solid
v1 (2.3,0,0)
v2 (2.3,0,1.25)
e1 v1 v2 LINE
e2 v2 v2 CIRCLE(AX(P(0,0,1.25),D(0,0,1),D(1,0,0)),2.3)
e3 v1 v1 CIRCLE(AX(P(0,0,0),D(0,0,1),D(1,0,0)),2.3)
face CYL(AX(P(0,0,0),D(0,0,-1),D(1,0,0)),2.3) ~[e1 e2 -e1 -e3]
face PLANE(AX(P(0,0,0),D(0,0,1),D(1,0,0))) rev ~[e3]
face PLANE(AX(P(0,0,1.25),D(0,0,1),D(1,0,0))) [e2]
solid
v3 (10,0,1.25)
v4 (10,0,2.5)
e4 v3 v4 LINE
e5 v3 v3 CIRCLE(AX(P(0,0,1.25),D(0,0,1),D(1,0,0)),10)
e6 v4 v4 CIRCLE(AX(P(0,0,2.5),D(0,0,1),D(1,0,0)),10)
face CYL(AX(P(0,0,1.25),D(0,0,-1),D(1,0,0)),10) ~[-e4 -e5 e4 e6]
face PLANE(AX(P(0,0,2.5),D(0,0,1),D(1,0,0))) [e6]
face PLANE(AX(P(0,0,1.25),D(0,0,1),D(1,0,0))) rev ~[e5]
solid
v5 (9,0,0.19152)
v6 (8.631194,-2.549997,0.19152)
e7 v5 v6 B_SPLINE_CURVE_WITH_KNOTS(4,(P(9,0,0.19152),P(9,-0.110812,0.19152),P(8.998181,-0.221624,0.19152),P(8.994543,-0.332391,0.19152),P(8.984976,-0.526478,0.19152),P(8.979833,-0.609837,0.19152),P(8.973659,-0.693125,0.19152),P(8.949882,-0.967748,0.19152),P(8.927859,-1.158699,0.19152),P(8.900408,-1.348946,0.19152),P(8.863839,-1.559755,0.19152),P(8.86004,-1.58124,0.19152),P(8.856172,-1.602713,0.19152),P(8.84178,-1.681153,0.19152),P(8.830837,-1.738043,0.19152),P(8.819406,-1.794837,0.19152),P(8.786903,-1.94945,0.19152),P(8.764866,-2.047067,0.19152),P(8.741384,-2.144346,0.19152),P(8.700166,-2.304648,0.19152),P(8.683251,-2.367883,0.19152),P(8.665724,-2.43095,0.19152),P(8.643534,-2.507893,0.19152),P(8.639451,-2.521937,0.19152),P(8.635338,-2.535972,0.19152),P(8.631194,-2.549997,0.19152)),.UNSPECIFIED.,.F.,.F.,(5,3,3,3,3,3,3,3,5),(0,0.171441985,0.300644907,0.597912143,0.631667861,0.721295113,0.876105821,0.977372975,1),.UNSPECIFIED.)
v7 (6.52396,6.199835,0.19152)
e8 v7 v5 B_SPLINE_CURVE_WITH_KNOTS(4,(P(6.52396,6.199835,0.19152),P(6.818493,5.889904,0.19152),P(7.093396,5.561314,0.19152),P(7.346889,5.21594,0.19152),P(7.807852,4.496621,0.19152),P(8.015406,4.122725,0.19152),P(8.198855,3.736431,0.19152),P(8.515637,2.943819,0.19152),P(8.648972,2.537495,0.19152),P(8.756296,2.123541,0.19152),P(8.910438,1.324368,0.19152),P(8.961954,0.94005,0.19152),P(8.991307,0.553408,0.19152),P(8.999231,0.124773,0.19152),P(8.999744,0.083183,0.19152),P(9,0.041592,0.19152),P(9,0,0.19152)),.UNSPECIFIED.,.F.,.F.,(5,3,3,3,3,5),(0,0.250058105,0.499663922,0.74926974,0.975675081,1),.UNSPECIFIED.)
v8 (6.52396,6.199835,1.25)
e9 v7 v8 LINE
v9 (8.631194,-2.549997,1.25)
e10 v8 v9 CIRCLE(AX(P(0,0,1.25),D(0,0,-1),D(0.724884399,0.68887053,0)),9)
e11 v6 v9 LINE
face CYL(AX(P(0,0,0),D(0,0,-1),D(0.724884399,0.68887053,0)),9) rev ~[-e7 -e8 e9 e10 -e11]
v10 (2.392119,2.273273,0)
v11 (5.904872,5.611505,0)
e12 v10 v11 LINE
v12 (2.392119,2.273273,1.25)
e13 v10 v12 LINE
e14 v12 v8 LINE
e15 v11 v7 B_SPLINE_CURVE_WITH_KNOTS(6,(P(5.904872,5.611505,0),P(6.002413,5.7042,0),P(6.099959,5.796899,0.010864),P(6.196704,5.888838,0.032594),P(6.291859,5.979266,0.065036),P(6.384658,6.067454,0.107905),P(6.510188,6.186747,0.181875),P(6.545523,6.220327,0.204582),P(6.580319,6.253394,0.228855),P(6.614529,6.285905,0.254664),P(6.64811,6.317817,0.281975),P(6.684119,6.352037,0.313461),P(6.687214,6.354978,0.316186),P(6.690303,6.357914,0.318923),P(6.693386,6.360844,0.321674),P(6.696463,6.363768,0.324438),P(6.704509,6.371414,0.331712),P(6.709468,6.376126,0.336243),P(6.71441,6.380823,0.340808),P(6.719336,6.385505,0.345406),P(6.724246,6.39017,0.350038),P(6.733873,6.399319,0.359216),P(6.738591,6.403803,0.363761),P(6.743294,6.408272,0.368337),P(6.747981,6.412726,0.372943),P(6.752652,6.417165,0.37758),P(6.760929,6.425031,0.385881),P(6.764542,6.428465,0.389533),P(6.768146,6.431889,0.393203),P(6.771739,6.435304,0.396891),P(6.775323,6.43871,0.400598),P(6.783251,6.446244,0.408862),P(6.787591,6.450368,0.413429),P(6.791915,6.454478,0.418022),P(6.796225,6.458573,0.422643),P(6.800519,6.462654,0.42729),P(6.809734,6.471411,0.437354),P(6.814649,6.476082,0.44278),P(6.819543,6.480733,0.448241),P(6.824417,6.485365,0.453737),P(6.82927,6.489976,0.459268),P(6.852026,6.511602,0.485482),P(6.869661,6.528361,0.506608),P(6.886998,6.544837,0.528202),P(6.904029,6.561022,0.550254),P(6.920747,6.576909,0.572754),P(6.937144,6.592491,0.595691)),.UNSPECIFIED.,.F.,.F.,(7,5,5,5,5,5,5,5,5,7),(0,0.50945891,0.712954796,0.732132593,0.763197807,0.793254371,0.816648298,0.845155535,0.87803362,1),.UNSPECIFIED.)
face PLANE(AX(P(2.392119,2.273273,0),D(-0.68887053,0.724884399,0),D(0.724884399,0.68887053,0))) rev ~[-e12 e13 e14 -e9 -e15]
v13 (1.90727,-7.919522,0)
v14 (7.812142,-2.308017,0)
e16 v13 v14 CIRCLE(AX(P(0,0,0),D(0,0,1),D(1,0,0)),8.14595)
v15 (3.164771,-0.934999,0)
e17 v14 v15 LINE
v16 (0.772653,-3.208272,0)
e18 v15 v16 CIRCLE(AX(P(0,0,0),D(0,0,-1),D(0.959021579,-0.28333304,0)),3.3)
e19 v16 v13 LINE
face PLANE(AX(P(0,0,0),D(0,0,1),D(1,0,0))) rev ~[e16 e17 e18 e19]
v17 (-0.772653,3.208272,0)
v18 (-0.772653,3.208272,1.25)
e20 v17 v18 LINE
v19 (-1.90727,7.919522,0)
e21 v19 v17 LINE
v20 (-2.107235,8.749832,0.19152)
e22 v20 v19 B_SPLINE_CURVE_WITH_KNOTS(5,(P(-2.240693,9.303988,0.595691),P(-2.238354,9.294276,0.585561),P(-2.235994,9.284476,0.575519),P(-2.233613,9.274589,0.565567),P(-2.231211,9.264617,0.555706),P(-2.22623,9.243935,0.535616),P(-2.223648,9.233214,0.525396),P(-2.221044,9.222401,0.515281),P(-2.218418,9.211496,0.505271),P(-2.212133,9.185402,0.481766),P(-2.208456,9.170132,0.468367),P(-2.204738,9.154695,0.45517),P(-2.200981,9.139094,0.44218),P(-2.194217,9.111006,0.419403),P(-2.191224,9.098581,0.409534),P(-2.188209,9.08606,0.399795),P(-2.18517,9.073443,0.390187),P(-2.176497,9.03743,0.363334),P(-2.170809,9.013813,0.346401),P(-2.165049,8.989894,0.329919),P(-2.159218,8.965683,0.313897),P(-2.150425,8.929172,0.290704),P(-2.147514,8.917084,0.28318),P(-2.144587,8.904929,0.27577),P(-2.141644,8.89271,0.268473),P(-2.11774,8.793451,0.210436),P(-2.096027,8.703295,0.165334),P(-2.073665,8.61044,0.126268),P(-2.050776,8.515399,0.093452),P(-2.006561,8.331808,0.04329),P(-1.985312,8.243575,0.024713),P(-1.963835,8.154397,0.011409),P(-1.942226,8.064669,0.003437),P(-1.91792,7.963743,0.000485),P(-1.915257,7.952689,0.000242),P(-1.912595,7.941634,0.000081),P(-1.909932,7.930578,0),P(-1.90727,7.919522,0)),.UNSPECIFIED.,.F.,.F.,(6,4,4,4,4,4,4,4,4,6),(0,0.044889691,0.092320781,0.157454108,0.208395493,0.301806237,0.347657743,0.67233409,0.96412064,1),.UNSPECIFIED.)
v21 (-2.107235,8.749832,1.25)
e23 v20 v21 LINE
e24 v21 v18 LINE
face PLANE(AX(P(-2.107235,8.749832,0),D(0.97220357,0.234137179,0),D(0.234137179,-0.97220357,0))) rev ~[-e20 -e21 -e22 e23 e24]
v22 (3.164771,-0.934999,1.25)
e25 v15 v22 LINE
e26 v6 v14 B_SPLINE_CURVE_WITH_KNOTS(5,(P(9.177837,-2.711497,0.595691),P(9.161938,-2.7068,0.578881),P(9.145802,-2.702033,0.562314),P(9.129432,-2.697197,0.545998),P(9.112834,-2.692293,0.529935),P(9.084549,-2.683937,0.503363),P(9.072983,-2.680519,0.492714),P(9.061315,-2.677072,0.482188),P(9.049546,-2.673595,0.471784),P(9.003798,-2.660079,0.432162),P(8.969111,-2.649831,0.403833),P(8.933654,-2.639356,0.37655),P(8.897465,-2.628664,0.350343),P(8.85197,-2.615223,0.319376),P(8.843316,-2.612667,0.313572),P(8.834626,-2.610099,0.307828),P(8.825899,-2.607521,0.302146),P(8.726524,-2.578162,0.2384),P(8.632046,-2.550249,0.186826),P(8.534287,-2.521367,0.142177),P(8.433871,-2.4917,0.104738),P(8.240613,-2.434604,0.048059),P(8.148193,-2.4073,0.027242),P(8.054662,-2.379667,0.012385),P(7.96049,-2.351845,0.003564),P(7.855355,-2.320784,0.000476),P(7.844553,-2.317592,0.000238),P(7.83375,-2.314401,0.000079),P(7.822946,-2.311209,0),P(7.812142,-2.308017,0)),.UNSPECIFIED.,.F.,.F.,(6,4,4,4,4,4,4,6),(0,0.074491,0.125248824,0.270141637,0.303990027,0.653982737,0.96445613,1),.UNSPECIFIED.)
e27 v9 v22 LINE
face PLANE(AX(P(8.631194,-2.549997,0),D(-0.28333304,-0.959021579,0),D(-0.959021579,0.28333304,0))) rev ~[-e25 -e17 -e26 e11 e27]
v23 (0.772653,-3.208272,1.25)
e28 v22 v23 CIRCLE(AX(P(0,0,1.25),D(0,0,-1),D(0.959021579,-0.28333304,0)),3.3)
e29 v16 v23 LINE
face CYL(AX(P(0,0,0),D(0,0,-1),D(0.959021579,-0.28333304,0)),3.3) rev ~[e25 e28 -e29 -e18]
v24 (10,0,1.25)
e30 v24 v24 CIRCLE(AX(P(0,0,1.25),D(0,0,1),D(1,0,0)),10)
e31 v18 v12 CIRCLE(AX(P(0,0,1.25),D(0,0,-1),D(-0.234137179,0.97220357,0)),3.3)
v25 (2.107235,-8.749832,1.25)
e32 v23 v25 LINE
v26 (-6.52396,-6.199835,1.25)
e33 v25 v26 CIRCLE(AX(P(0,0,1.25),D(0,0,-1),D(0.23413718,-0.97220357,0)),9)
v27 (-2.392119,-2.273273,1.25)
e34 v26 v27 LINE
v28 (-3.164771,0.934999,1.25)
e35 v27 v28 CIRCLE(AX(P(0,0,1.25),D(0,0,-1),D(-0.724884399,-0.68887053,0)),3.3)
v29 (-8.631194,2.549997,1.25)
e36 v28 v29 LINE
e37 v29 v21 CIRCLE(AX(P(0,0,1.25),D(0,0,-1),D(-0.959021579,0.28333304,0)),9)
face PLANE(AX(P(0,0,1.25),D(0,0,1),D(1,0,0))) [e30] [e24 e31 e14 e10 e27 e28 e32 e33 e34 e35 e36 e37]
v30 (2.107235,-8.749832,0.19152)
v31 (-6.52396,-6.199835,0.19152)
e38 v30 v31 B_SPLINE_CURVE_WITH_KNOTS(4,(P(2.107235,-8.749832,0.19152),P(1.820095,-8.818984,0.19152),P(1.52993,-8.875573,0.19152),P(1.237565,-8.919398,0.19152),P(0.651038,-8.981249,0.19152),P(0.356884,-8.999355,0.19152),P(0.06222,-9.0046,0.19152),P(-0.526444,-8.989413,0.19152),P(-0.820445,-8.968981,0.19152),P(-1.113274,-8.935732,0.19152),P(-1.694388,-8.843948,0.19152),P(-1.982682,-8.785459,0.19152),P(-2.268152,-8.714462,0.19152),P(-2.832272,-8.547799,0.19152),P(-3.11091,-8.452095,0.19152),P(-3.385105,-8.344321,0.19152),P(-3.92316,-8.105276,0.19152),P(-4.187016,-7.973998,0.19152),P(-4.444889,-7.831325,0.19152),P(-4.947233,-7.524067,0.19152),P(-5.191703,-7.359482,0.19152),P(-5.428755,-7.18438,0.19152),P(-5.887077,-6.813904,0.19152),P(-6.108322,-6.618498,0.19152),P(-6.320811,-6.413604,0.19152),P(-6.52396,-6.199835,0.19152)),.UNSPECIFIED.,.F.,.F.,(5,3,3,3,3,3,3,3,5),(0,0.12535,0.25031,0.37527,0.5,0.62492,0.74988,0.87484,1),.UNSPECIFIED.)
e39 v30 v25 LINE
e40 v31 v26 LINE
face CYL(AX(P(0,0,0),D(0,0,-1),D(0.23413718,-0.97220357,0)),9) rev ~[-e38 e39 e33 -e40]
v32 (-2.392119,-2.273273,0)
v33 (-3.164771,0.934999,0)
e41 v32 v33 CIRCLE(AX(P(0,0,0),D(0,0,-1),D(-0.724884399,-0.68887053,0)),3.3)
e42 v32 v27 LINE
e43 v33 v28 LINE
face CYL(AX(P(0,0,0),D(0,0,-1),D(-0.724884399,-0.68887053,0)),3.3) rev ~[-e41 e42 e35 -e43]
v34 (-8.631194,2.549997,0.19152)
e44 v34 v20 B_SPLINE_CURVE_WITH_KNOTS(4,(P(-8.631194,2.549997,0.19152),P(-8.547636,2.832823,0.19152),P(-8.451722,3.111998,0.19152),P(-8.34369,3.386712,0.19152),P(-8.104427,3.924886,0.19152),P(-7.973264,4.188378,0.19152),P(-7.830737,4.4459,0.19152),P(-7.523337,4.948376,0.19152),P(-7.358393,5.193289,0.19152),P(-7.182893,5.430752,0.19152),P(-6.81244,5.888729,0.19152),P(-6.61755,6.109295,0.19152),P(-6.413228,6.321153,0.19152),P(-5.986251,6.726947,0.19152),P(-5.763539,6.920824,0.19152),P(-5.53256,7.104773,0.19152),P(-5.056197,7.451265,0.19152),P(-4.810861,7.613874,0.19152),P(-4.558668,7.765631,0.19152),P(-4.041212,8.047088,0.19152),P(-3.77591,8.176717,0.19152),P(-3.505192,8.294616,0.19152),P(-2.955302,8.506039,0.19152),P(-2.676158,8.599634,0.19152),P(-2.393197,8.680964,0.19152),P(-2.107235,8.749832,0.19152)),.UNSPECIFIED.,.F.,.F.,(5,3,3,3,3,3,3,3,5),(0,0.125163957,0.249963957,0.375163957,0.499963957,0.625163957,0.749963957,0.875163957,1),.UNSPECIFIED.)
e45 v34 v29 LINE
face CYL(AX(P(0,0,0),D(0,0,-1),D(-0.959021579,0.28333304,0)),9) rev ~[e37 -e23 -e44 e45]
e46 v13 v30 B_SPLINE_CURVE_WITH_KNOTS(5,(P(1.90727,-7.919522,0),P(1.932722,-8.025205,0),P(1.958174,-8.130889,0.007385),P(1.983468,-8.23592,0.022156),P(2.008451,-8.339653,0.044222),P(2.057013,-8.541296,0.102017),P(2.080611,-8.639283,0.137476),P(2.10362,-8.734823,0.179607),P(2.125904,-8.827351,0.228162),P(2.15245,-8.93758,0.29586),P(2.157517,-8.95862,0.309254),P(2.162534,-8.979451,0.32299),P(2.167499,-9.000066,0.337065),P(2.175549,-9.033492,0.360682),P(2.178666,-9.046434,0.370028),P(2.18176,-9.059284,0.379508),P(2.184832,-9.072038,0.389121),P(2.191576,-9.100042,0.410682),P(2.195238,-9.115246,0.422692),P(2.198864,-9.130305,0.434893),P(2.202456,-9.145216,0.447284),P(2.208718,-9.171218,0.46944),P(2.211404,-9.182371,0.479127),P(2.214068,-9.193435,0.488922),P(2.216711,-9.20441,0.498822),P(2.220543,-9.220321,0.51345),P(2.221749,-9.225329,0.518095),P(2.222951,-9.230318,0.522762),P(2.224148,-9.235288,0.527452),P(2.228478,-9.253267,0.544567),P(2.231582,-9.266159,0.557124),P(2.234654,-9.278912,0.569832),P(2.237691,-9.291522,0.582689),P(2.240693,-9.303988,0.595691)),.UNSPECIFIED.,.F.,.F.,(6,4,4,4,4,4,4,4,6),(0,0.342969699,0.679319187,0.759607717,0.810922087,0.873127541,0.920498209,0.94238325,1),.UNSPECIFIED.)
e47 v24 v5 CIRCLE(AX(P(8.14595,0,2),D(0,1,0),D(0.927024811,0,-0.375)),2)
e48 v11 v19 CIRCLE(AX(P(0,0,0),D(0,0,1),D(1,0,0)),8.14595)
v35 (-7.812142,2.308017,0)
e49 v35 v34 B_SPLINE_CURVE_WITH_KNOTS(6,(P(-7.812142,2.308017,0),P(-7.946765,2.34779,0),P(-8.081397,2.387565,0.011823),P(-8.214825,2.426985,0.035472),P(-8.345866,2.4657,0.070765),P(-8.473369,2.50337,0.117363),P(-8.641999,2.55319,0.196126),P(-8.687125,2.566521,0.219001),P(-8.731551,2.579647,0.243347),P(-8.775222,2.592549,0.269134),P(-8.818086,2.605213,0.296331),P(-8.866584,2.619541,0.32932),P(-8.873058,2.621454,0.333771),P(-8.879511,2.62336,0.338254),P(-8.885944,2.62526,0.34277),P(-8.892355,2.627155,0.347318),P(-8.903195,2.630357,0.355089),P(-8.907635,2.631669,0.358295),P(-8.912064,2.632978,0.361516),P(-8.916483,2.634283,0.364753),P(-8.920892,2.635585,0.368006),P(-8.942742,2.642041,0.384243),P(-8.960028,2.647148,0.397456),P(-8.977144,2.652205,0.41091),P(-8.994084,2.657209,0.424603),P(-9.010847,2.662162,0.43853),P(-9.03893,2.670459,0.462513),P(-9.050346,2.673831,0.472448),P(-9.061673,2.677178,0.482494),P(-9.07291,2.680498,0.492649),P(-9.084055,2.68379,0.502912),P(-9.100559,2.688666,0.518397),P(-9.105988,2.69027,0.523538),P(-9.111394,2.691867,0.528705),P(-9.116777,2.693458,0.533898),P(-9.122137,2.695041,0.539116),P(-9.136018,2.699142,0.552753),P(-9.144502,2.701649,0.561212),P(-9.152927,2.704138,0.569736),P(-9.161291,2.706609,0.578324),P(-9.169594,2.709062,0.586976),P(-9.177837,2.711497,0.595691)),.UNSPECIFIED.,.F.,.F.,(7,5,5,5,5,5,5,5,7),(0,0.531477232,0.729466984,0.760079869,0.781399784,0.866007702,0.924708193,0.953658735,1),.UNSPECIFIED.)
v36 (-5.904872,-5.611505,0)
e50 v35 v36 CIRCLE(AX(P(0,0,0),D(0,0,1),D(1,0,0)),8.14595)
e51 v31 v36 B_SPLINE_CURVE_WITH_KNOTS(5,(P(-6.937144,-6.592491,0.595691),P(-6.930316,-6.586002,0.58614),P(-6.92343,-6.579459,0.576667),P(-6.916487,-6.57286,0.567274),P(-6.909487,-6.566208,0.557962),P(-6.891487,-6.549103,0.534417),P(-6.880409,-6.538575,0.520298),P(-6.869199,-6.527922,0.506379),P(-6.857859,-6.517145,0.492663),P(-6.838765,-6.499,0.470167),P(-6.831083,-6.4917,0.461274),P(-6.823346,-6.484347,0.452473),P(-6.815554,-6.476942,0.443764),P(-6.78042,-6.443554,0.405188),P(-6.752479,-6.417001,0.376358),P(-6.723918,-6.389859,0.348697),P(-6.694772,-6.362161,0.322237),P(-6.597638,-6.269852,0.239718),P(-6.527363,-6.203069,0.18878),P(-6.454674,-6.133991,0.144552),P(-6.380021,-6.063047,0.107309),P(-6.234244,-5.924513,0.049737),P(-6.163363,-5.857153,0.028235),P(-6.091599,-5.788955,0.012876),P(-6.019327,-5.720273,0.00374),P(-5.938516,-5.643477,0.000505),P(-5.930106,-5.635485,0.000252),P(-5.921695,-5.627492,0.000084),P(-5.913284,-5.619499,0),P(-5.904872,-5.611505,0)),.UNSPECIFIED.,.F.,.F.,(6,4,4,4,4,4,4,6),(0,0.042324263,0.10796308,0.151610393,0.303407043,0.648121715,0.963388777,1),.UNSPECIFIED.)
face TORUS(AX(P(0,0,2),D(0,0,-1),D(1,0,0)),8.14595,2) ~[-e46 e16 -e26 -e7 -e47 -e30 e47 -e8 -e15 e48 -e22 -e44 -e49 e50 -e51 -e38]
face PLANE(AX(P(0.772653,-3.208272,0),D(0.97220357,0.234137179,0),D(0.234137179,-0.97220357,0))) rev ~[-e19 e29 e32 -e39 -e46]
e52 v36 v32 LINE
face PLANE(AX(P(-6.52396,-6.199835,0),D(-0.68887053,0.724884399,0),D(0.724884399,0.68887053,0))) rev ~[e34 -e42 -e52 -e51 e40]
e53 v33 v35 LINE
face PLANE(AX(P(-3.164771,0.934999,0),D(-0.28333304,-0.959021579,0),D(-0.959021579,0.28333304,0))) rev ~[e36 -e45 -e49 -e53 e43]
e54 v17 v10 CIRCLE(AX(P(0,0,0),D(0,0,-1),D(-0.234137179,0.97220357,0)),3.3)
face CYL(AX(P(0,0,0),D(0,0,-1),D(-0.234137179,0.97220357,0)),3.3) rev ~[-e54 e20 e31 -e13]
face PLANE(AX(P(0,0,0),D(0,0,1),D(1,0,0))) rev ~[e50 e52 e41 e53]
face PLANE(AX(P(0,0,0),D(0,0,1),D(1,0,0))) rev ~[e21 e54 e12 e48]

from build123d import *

# Parameters (mm, degrees)
F0_R     = 2.3
F1_DEPTH = 1.25
F0_R_2   = 10
F3_START = 1.25
F3_DEPTH = 1.25


# Not quite as in the source:
# - a fillet or chamfer that OpenCascade refuses, or shapes differently, is made with other operations: its cross-section is extruded or revolved along the edge and cut away or added


with BuildPart() as f1:
    # F0 (on Top) → F1 (new body)
    with BuildSketch(Plane.XY):
        Circle(F0_R)
    extrude(amount=F1_DEPTH)


with BuildPart() as f1b:
    # F0 (on Top) → F1, piece 2 (new body)
    with BuildSketch(Plane.XY):
        Circle(F0_R_2)
        with BuildLine():
            ThreePointArc((2.1072346154, -8.7498321284), (-2.5499973556, -8.6311942098), (-6.5239595944, -6.1998347729))
            Line((-6.5239595944, -6.1998347729), (-2.3921185179, -2.27327275))
            ThreePointArc((-2.3921185179, -2.27327275), (-3.2082717804, -0.7726526923), (-3.1647712102, 0.9349990304))
            Line((-3.1647712102, 0.9349990304), (-8.6311942098, 2.5499973556))
            ThreePointArc((-8.6311942098, 2.5499973556), (-6.1998347729, 6.5239595944), (-2.1072346154, 8.7498321284))
            Line((-2.1072346154, 8.7498321284), (-0.7726526923, 3.2082717804))
            ThreePointArc((-0.7726526923, 3.2082717804), (0.9349990304, 3.1647712102), (2.3921185179, 2.27327275))
            Line((2.3921185179, 2.27327275), (6.5239595944, 6.1998347729))
            ThreePointArc((6.5239595944, 6.1998347729), (8.7498321284, 2.1072346154), (8.6311942098, -2.5499973556))
            Line((8.6311942098, -2.5499973556), (3.1647712102, -0.9349990304))
            ThreePointArc((3.1647712102, -0.9349990304), (2.27327275, -2.3921185179), (0.7726526923, -3.2082717804))
            Line((0.7726526923, -3.2082717804), (2.1072346154, -8.7498321284))
        make_face(mode=Mode.SUBTRACT)
    extrude(amount=F1_DEPTH)

    # F2: fillet of radius 2 on 1 edges, made by hand

    # F2_s1 → F2_t2 (revolve, cut)
    with BuildSketch(Plane.XZ):
        with BuildLine():
            ThreePointArc((10, 1.25), (9.263984367, 0.3416876048), (8.1459503782, 0))
            Line((8.1459503782, 0), (10, 0))
            Line((10, 0), (10, 1.25))
        make_face()
    revolve(axis=Axis((0, 0, 0), (0, 0, 1)), mode=Mode.SUBTRACT)


with BuildPart() as f3:
    # F0 (on Top) → F3 (new body)
    with BuildSketch(Plane.XY.offset(F3_START)):
        Circle(F0_R_2)
        with BuildLine():
            ThreePointArc((2.1072346154, -8.7498321284), (-2.5499973556, -8.6311942098), (-6.5239595944, -6.1998347729))
            Line((-6.5239595944, -6.1998347729), (-2.3921185179, -2.27327275))
            ThreePointArc((-2.3921185179, -2.27327275), (-3.2082717804, -0.7726526923), (-3.1647712102, 0.9349990304))
            Line((-3.1647712102, 0.9349990304), (-8.6311942098, 2.5499973556))
            ThreePointArc((-8.6311942098, 2.5499973556), (-6.1998347729, 6.5239595944), (-2.1072346154, 8.7498321284))
            Line((-2.1072346154, 8.7498321284), (-0.7726526923, 3.2082717804))
            ThreePointArc((-0.7726526923, 3.2082717804), (0.9349990304, 3.1647712102), (2.3921185179, 2.27327275))
            Line((2.3921185179, 2.27327275), (6.5239595944, 6.1998347729))
            ThreePointArc((6.5239595944, 6.1998347729), (8.7498321284, 2.1072346154), (8.6311942098, -2.5499973556))
            Line((8.6311942098, -2.5499973556), (3.1647712102, -0.9349990304))
            ThreePointArc((3.1647712102, -0.9349990304), (2.27327275, -2.3921185179), (0.7726526923, -3.2082717804))
            Line((0.7726526923, -3.2082717804), (2.1072346154, -8.7498321284))
        make_face(mode=Mode.SUBTRACT)
        with BuildLine():
            Line((-2.3921185179, -2.27327275), (-6.5239595944, -6.1998347729))
            ThreePointArc((-6.5239595944, -6.1998347729), (-2.5499973556, -8.6311942098), (2.1072346154, -8.7498321284))
            Line((2.1072346154, -8.7498321284), (0.7726526923, -3.2082717804))
            ThreePointArc((0.7726526923, -3.2082717804), (2.27327275, -2.3921185179), (3.1647712102, -0.9349990304))
            Line((3.1647712102, -0.9349990304), (8.6311942098, -2.5499973556))
            ThreePointArc((8.6311942098, -2.5499973556), (8.7498321284, 2.1072346154), (6.5239595944, 6.1998347729))
            Line((6.5239595944, 6.1998347729), (2.3921185179, 2.27327275))
            ThreePointArc((2.3921185179, 2.27327275), (0.9349990304, 3.1647712102), (-0.7726526923, 3.2082717804))
            Line((-0.7726526923, 3.2082717804), (-2.1072346154, 8.7498321284))
            ThreePointArc((-2.1072346154, 8.7498321284), (-6.1998347729, 6.5239595944), (-8.6311942098, 2.5499973556))
            Line((-8.6311942098, 2.5499973556), (-3.1647712102, 0.9349990304))
            ThreePointArc((-3.1647712102, 0.9349990304), (-3.2082717804, -0.7726526923), (-2.3921185179, -2.27327275))
        make_face()
        Circle(F0_R, mode=Mode.SUBTRACT)
        Circle(F0_R)
    extrude(amount=F3_DEPTH)


solid = Compound([f1.part, f1b.part, f3.part])
